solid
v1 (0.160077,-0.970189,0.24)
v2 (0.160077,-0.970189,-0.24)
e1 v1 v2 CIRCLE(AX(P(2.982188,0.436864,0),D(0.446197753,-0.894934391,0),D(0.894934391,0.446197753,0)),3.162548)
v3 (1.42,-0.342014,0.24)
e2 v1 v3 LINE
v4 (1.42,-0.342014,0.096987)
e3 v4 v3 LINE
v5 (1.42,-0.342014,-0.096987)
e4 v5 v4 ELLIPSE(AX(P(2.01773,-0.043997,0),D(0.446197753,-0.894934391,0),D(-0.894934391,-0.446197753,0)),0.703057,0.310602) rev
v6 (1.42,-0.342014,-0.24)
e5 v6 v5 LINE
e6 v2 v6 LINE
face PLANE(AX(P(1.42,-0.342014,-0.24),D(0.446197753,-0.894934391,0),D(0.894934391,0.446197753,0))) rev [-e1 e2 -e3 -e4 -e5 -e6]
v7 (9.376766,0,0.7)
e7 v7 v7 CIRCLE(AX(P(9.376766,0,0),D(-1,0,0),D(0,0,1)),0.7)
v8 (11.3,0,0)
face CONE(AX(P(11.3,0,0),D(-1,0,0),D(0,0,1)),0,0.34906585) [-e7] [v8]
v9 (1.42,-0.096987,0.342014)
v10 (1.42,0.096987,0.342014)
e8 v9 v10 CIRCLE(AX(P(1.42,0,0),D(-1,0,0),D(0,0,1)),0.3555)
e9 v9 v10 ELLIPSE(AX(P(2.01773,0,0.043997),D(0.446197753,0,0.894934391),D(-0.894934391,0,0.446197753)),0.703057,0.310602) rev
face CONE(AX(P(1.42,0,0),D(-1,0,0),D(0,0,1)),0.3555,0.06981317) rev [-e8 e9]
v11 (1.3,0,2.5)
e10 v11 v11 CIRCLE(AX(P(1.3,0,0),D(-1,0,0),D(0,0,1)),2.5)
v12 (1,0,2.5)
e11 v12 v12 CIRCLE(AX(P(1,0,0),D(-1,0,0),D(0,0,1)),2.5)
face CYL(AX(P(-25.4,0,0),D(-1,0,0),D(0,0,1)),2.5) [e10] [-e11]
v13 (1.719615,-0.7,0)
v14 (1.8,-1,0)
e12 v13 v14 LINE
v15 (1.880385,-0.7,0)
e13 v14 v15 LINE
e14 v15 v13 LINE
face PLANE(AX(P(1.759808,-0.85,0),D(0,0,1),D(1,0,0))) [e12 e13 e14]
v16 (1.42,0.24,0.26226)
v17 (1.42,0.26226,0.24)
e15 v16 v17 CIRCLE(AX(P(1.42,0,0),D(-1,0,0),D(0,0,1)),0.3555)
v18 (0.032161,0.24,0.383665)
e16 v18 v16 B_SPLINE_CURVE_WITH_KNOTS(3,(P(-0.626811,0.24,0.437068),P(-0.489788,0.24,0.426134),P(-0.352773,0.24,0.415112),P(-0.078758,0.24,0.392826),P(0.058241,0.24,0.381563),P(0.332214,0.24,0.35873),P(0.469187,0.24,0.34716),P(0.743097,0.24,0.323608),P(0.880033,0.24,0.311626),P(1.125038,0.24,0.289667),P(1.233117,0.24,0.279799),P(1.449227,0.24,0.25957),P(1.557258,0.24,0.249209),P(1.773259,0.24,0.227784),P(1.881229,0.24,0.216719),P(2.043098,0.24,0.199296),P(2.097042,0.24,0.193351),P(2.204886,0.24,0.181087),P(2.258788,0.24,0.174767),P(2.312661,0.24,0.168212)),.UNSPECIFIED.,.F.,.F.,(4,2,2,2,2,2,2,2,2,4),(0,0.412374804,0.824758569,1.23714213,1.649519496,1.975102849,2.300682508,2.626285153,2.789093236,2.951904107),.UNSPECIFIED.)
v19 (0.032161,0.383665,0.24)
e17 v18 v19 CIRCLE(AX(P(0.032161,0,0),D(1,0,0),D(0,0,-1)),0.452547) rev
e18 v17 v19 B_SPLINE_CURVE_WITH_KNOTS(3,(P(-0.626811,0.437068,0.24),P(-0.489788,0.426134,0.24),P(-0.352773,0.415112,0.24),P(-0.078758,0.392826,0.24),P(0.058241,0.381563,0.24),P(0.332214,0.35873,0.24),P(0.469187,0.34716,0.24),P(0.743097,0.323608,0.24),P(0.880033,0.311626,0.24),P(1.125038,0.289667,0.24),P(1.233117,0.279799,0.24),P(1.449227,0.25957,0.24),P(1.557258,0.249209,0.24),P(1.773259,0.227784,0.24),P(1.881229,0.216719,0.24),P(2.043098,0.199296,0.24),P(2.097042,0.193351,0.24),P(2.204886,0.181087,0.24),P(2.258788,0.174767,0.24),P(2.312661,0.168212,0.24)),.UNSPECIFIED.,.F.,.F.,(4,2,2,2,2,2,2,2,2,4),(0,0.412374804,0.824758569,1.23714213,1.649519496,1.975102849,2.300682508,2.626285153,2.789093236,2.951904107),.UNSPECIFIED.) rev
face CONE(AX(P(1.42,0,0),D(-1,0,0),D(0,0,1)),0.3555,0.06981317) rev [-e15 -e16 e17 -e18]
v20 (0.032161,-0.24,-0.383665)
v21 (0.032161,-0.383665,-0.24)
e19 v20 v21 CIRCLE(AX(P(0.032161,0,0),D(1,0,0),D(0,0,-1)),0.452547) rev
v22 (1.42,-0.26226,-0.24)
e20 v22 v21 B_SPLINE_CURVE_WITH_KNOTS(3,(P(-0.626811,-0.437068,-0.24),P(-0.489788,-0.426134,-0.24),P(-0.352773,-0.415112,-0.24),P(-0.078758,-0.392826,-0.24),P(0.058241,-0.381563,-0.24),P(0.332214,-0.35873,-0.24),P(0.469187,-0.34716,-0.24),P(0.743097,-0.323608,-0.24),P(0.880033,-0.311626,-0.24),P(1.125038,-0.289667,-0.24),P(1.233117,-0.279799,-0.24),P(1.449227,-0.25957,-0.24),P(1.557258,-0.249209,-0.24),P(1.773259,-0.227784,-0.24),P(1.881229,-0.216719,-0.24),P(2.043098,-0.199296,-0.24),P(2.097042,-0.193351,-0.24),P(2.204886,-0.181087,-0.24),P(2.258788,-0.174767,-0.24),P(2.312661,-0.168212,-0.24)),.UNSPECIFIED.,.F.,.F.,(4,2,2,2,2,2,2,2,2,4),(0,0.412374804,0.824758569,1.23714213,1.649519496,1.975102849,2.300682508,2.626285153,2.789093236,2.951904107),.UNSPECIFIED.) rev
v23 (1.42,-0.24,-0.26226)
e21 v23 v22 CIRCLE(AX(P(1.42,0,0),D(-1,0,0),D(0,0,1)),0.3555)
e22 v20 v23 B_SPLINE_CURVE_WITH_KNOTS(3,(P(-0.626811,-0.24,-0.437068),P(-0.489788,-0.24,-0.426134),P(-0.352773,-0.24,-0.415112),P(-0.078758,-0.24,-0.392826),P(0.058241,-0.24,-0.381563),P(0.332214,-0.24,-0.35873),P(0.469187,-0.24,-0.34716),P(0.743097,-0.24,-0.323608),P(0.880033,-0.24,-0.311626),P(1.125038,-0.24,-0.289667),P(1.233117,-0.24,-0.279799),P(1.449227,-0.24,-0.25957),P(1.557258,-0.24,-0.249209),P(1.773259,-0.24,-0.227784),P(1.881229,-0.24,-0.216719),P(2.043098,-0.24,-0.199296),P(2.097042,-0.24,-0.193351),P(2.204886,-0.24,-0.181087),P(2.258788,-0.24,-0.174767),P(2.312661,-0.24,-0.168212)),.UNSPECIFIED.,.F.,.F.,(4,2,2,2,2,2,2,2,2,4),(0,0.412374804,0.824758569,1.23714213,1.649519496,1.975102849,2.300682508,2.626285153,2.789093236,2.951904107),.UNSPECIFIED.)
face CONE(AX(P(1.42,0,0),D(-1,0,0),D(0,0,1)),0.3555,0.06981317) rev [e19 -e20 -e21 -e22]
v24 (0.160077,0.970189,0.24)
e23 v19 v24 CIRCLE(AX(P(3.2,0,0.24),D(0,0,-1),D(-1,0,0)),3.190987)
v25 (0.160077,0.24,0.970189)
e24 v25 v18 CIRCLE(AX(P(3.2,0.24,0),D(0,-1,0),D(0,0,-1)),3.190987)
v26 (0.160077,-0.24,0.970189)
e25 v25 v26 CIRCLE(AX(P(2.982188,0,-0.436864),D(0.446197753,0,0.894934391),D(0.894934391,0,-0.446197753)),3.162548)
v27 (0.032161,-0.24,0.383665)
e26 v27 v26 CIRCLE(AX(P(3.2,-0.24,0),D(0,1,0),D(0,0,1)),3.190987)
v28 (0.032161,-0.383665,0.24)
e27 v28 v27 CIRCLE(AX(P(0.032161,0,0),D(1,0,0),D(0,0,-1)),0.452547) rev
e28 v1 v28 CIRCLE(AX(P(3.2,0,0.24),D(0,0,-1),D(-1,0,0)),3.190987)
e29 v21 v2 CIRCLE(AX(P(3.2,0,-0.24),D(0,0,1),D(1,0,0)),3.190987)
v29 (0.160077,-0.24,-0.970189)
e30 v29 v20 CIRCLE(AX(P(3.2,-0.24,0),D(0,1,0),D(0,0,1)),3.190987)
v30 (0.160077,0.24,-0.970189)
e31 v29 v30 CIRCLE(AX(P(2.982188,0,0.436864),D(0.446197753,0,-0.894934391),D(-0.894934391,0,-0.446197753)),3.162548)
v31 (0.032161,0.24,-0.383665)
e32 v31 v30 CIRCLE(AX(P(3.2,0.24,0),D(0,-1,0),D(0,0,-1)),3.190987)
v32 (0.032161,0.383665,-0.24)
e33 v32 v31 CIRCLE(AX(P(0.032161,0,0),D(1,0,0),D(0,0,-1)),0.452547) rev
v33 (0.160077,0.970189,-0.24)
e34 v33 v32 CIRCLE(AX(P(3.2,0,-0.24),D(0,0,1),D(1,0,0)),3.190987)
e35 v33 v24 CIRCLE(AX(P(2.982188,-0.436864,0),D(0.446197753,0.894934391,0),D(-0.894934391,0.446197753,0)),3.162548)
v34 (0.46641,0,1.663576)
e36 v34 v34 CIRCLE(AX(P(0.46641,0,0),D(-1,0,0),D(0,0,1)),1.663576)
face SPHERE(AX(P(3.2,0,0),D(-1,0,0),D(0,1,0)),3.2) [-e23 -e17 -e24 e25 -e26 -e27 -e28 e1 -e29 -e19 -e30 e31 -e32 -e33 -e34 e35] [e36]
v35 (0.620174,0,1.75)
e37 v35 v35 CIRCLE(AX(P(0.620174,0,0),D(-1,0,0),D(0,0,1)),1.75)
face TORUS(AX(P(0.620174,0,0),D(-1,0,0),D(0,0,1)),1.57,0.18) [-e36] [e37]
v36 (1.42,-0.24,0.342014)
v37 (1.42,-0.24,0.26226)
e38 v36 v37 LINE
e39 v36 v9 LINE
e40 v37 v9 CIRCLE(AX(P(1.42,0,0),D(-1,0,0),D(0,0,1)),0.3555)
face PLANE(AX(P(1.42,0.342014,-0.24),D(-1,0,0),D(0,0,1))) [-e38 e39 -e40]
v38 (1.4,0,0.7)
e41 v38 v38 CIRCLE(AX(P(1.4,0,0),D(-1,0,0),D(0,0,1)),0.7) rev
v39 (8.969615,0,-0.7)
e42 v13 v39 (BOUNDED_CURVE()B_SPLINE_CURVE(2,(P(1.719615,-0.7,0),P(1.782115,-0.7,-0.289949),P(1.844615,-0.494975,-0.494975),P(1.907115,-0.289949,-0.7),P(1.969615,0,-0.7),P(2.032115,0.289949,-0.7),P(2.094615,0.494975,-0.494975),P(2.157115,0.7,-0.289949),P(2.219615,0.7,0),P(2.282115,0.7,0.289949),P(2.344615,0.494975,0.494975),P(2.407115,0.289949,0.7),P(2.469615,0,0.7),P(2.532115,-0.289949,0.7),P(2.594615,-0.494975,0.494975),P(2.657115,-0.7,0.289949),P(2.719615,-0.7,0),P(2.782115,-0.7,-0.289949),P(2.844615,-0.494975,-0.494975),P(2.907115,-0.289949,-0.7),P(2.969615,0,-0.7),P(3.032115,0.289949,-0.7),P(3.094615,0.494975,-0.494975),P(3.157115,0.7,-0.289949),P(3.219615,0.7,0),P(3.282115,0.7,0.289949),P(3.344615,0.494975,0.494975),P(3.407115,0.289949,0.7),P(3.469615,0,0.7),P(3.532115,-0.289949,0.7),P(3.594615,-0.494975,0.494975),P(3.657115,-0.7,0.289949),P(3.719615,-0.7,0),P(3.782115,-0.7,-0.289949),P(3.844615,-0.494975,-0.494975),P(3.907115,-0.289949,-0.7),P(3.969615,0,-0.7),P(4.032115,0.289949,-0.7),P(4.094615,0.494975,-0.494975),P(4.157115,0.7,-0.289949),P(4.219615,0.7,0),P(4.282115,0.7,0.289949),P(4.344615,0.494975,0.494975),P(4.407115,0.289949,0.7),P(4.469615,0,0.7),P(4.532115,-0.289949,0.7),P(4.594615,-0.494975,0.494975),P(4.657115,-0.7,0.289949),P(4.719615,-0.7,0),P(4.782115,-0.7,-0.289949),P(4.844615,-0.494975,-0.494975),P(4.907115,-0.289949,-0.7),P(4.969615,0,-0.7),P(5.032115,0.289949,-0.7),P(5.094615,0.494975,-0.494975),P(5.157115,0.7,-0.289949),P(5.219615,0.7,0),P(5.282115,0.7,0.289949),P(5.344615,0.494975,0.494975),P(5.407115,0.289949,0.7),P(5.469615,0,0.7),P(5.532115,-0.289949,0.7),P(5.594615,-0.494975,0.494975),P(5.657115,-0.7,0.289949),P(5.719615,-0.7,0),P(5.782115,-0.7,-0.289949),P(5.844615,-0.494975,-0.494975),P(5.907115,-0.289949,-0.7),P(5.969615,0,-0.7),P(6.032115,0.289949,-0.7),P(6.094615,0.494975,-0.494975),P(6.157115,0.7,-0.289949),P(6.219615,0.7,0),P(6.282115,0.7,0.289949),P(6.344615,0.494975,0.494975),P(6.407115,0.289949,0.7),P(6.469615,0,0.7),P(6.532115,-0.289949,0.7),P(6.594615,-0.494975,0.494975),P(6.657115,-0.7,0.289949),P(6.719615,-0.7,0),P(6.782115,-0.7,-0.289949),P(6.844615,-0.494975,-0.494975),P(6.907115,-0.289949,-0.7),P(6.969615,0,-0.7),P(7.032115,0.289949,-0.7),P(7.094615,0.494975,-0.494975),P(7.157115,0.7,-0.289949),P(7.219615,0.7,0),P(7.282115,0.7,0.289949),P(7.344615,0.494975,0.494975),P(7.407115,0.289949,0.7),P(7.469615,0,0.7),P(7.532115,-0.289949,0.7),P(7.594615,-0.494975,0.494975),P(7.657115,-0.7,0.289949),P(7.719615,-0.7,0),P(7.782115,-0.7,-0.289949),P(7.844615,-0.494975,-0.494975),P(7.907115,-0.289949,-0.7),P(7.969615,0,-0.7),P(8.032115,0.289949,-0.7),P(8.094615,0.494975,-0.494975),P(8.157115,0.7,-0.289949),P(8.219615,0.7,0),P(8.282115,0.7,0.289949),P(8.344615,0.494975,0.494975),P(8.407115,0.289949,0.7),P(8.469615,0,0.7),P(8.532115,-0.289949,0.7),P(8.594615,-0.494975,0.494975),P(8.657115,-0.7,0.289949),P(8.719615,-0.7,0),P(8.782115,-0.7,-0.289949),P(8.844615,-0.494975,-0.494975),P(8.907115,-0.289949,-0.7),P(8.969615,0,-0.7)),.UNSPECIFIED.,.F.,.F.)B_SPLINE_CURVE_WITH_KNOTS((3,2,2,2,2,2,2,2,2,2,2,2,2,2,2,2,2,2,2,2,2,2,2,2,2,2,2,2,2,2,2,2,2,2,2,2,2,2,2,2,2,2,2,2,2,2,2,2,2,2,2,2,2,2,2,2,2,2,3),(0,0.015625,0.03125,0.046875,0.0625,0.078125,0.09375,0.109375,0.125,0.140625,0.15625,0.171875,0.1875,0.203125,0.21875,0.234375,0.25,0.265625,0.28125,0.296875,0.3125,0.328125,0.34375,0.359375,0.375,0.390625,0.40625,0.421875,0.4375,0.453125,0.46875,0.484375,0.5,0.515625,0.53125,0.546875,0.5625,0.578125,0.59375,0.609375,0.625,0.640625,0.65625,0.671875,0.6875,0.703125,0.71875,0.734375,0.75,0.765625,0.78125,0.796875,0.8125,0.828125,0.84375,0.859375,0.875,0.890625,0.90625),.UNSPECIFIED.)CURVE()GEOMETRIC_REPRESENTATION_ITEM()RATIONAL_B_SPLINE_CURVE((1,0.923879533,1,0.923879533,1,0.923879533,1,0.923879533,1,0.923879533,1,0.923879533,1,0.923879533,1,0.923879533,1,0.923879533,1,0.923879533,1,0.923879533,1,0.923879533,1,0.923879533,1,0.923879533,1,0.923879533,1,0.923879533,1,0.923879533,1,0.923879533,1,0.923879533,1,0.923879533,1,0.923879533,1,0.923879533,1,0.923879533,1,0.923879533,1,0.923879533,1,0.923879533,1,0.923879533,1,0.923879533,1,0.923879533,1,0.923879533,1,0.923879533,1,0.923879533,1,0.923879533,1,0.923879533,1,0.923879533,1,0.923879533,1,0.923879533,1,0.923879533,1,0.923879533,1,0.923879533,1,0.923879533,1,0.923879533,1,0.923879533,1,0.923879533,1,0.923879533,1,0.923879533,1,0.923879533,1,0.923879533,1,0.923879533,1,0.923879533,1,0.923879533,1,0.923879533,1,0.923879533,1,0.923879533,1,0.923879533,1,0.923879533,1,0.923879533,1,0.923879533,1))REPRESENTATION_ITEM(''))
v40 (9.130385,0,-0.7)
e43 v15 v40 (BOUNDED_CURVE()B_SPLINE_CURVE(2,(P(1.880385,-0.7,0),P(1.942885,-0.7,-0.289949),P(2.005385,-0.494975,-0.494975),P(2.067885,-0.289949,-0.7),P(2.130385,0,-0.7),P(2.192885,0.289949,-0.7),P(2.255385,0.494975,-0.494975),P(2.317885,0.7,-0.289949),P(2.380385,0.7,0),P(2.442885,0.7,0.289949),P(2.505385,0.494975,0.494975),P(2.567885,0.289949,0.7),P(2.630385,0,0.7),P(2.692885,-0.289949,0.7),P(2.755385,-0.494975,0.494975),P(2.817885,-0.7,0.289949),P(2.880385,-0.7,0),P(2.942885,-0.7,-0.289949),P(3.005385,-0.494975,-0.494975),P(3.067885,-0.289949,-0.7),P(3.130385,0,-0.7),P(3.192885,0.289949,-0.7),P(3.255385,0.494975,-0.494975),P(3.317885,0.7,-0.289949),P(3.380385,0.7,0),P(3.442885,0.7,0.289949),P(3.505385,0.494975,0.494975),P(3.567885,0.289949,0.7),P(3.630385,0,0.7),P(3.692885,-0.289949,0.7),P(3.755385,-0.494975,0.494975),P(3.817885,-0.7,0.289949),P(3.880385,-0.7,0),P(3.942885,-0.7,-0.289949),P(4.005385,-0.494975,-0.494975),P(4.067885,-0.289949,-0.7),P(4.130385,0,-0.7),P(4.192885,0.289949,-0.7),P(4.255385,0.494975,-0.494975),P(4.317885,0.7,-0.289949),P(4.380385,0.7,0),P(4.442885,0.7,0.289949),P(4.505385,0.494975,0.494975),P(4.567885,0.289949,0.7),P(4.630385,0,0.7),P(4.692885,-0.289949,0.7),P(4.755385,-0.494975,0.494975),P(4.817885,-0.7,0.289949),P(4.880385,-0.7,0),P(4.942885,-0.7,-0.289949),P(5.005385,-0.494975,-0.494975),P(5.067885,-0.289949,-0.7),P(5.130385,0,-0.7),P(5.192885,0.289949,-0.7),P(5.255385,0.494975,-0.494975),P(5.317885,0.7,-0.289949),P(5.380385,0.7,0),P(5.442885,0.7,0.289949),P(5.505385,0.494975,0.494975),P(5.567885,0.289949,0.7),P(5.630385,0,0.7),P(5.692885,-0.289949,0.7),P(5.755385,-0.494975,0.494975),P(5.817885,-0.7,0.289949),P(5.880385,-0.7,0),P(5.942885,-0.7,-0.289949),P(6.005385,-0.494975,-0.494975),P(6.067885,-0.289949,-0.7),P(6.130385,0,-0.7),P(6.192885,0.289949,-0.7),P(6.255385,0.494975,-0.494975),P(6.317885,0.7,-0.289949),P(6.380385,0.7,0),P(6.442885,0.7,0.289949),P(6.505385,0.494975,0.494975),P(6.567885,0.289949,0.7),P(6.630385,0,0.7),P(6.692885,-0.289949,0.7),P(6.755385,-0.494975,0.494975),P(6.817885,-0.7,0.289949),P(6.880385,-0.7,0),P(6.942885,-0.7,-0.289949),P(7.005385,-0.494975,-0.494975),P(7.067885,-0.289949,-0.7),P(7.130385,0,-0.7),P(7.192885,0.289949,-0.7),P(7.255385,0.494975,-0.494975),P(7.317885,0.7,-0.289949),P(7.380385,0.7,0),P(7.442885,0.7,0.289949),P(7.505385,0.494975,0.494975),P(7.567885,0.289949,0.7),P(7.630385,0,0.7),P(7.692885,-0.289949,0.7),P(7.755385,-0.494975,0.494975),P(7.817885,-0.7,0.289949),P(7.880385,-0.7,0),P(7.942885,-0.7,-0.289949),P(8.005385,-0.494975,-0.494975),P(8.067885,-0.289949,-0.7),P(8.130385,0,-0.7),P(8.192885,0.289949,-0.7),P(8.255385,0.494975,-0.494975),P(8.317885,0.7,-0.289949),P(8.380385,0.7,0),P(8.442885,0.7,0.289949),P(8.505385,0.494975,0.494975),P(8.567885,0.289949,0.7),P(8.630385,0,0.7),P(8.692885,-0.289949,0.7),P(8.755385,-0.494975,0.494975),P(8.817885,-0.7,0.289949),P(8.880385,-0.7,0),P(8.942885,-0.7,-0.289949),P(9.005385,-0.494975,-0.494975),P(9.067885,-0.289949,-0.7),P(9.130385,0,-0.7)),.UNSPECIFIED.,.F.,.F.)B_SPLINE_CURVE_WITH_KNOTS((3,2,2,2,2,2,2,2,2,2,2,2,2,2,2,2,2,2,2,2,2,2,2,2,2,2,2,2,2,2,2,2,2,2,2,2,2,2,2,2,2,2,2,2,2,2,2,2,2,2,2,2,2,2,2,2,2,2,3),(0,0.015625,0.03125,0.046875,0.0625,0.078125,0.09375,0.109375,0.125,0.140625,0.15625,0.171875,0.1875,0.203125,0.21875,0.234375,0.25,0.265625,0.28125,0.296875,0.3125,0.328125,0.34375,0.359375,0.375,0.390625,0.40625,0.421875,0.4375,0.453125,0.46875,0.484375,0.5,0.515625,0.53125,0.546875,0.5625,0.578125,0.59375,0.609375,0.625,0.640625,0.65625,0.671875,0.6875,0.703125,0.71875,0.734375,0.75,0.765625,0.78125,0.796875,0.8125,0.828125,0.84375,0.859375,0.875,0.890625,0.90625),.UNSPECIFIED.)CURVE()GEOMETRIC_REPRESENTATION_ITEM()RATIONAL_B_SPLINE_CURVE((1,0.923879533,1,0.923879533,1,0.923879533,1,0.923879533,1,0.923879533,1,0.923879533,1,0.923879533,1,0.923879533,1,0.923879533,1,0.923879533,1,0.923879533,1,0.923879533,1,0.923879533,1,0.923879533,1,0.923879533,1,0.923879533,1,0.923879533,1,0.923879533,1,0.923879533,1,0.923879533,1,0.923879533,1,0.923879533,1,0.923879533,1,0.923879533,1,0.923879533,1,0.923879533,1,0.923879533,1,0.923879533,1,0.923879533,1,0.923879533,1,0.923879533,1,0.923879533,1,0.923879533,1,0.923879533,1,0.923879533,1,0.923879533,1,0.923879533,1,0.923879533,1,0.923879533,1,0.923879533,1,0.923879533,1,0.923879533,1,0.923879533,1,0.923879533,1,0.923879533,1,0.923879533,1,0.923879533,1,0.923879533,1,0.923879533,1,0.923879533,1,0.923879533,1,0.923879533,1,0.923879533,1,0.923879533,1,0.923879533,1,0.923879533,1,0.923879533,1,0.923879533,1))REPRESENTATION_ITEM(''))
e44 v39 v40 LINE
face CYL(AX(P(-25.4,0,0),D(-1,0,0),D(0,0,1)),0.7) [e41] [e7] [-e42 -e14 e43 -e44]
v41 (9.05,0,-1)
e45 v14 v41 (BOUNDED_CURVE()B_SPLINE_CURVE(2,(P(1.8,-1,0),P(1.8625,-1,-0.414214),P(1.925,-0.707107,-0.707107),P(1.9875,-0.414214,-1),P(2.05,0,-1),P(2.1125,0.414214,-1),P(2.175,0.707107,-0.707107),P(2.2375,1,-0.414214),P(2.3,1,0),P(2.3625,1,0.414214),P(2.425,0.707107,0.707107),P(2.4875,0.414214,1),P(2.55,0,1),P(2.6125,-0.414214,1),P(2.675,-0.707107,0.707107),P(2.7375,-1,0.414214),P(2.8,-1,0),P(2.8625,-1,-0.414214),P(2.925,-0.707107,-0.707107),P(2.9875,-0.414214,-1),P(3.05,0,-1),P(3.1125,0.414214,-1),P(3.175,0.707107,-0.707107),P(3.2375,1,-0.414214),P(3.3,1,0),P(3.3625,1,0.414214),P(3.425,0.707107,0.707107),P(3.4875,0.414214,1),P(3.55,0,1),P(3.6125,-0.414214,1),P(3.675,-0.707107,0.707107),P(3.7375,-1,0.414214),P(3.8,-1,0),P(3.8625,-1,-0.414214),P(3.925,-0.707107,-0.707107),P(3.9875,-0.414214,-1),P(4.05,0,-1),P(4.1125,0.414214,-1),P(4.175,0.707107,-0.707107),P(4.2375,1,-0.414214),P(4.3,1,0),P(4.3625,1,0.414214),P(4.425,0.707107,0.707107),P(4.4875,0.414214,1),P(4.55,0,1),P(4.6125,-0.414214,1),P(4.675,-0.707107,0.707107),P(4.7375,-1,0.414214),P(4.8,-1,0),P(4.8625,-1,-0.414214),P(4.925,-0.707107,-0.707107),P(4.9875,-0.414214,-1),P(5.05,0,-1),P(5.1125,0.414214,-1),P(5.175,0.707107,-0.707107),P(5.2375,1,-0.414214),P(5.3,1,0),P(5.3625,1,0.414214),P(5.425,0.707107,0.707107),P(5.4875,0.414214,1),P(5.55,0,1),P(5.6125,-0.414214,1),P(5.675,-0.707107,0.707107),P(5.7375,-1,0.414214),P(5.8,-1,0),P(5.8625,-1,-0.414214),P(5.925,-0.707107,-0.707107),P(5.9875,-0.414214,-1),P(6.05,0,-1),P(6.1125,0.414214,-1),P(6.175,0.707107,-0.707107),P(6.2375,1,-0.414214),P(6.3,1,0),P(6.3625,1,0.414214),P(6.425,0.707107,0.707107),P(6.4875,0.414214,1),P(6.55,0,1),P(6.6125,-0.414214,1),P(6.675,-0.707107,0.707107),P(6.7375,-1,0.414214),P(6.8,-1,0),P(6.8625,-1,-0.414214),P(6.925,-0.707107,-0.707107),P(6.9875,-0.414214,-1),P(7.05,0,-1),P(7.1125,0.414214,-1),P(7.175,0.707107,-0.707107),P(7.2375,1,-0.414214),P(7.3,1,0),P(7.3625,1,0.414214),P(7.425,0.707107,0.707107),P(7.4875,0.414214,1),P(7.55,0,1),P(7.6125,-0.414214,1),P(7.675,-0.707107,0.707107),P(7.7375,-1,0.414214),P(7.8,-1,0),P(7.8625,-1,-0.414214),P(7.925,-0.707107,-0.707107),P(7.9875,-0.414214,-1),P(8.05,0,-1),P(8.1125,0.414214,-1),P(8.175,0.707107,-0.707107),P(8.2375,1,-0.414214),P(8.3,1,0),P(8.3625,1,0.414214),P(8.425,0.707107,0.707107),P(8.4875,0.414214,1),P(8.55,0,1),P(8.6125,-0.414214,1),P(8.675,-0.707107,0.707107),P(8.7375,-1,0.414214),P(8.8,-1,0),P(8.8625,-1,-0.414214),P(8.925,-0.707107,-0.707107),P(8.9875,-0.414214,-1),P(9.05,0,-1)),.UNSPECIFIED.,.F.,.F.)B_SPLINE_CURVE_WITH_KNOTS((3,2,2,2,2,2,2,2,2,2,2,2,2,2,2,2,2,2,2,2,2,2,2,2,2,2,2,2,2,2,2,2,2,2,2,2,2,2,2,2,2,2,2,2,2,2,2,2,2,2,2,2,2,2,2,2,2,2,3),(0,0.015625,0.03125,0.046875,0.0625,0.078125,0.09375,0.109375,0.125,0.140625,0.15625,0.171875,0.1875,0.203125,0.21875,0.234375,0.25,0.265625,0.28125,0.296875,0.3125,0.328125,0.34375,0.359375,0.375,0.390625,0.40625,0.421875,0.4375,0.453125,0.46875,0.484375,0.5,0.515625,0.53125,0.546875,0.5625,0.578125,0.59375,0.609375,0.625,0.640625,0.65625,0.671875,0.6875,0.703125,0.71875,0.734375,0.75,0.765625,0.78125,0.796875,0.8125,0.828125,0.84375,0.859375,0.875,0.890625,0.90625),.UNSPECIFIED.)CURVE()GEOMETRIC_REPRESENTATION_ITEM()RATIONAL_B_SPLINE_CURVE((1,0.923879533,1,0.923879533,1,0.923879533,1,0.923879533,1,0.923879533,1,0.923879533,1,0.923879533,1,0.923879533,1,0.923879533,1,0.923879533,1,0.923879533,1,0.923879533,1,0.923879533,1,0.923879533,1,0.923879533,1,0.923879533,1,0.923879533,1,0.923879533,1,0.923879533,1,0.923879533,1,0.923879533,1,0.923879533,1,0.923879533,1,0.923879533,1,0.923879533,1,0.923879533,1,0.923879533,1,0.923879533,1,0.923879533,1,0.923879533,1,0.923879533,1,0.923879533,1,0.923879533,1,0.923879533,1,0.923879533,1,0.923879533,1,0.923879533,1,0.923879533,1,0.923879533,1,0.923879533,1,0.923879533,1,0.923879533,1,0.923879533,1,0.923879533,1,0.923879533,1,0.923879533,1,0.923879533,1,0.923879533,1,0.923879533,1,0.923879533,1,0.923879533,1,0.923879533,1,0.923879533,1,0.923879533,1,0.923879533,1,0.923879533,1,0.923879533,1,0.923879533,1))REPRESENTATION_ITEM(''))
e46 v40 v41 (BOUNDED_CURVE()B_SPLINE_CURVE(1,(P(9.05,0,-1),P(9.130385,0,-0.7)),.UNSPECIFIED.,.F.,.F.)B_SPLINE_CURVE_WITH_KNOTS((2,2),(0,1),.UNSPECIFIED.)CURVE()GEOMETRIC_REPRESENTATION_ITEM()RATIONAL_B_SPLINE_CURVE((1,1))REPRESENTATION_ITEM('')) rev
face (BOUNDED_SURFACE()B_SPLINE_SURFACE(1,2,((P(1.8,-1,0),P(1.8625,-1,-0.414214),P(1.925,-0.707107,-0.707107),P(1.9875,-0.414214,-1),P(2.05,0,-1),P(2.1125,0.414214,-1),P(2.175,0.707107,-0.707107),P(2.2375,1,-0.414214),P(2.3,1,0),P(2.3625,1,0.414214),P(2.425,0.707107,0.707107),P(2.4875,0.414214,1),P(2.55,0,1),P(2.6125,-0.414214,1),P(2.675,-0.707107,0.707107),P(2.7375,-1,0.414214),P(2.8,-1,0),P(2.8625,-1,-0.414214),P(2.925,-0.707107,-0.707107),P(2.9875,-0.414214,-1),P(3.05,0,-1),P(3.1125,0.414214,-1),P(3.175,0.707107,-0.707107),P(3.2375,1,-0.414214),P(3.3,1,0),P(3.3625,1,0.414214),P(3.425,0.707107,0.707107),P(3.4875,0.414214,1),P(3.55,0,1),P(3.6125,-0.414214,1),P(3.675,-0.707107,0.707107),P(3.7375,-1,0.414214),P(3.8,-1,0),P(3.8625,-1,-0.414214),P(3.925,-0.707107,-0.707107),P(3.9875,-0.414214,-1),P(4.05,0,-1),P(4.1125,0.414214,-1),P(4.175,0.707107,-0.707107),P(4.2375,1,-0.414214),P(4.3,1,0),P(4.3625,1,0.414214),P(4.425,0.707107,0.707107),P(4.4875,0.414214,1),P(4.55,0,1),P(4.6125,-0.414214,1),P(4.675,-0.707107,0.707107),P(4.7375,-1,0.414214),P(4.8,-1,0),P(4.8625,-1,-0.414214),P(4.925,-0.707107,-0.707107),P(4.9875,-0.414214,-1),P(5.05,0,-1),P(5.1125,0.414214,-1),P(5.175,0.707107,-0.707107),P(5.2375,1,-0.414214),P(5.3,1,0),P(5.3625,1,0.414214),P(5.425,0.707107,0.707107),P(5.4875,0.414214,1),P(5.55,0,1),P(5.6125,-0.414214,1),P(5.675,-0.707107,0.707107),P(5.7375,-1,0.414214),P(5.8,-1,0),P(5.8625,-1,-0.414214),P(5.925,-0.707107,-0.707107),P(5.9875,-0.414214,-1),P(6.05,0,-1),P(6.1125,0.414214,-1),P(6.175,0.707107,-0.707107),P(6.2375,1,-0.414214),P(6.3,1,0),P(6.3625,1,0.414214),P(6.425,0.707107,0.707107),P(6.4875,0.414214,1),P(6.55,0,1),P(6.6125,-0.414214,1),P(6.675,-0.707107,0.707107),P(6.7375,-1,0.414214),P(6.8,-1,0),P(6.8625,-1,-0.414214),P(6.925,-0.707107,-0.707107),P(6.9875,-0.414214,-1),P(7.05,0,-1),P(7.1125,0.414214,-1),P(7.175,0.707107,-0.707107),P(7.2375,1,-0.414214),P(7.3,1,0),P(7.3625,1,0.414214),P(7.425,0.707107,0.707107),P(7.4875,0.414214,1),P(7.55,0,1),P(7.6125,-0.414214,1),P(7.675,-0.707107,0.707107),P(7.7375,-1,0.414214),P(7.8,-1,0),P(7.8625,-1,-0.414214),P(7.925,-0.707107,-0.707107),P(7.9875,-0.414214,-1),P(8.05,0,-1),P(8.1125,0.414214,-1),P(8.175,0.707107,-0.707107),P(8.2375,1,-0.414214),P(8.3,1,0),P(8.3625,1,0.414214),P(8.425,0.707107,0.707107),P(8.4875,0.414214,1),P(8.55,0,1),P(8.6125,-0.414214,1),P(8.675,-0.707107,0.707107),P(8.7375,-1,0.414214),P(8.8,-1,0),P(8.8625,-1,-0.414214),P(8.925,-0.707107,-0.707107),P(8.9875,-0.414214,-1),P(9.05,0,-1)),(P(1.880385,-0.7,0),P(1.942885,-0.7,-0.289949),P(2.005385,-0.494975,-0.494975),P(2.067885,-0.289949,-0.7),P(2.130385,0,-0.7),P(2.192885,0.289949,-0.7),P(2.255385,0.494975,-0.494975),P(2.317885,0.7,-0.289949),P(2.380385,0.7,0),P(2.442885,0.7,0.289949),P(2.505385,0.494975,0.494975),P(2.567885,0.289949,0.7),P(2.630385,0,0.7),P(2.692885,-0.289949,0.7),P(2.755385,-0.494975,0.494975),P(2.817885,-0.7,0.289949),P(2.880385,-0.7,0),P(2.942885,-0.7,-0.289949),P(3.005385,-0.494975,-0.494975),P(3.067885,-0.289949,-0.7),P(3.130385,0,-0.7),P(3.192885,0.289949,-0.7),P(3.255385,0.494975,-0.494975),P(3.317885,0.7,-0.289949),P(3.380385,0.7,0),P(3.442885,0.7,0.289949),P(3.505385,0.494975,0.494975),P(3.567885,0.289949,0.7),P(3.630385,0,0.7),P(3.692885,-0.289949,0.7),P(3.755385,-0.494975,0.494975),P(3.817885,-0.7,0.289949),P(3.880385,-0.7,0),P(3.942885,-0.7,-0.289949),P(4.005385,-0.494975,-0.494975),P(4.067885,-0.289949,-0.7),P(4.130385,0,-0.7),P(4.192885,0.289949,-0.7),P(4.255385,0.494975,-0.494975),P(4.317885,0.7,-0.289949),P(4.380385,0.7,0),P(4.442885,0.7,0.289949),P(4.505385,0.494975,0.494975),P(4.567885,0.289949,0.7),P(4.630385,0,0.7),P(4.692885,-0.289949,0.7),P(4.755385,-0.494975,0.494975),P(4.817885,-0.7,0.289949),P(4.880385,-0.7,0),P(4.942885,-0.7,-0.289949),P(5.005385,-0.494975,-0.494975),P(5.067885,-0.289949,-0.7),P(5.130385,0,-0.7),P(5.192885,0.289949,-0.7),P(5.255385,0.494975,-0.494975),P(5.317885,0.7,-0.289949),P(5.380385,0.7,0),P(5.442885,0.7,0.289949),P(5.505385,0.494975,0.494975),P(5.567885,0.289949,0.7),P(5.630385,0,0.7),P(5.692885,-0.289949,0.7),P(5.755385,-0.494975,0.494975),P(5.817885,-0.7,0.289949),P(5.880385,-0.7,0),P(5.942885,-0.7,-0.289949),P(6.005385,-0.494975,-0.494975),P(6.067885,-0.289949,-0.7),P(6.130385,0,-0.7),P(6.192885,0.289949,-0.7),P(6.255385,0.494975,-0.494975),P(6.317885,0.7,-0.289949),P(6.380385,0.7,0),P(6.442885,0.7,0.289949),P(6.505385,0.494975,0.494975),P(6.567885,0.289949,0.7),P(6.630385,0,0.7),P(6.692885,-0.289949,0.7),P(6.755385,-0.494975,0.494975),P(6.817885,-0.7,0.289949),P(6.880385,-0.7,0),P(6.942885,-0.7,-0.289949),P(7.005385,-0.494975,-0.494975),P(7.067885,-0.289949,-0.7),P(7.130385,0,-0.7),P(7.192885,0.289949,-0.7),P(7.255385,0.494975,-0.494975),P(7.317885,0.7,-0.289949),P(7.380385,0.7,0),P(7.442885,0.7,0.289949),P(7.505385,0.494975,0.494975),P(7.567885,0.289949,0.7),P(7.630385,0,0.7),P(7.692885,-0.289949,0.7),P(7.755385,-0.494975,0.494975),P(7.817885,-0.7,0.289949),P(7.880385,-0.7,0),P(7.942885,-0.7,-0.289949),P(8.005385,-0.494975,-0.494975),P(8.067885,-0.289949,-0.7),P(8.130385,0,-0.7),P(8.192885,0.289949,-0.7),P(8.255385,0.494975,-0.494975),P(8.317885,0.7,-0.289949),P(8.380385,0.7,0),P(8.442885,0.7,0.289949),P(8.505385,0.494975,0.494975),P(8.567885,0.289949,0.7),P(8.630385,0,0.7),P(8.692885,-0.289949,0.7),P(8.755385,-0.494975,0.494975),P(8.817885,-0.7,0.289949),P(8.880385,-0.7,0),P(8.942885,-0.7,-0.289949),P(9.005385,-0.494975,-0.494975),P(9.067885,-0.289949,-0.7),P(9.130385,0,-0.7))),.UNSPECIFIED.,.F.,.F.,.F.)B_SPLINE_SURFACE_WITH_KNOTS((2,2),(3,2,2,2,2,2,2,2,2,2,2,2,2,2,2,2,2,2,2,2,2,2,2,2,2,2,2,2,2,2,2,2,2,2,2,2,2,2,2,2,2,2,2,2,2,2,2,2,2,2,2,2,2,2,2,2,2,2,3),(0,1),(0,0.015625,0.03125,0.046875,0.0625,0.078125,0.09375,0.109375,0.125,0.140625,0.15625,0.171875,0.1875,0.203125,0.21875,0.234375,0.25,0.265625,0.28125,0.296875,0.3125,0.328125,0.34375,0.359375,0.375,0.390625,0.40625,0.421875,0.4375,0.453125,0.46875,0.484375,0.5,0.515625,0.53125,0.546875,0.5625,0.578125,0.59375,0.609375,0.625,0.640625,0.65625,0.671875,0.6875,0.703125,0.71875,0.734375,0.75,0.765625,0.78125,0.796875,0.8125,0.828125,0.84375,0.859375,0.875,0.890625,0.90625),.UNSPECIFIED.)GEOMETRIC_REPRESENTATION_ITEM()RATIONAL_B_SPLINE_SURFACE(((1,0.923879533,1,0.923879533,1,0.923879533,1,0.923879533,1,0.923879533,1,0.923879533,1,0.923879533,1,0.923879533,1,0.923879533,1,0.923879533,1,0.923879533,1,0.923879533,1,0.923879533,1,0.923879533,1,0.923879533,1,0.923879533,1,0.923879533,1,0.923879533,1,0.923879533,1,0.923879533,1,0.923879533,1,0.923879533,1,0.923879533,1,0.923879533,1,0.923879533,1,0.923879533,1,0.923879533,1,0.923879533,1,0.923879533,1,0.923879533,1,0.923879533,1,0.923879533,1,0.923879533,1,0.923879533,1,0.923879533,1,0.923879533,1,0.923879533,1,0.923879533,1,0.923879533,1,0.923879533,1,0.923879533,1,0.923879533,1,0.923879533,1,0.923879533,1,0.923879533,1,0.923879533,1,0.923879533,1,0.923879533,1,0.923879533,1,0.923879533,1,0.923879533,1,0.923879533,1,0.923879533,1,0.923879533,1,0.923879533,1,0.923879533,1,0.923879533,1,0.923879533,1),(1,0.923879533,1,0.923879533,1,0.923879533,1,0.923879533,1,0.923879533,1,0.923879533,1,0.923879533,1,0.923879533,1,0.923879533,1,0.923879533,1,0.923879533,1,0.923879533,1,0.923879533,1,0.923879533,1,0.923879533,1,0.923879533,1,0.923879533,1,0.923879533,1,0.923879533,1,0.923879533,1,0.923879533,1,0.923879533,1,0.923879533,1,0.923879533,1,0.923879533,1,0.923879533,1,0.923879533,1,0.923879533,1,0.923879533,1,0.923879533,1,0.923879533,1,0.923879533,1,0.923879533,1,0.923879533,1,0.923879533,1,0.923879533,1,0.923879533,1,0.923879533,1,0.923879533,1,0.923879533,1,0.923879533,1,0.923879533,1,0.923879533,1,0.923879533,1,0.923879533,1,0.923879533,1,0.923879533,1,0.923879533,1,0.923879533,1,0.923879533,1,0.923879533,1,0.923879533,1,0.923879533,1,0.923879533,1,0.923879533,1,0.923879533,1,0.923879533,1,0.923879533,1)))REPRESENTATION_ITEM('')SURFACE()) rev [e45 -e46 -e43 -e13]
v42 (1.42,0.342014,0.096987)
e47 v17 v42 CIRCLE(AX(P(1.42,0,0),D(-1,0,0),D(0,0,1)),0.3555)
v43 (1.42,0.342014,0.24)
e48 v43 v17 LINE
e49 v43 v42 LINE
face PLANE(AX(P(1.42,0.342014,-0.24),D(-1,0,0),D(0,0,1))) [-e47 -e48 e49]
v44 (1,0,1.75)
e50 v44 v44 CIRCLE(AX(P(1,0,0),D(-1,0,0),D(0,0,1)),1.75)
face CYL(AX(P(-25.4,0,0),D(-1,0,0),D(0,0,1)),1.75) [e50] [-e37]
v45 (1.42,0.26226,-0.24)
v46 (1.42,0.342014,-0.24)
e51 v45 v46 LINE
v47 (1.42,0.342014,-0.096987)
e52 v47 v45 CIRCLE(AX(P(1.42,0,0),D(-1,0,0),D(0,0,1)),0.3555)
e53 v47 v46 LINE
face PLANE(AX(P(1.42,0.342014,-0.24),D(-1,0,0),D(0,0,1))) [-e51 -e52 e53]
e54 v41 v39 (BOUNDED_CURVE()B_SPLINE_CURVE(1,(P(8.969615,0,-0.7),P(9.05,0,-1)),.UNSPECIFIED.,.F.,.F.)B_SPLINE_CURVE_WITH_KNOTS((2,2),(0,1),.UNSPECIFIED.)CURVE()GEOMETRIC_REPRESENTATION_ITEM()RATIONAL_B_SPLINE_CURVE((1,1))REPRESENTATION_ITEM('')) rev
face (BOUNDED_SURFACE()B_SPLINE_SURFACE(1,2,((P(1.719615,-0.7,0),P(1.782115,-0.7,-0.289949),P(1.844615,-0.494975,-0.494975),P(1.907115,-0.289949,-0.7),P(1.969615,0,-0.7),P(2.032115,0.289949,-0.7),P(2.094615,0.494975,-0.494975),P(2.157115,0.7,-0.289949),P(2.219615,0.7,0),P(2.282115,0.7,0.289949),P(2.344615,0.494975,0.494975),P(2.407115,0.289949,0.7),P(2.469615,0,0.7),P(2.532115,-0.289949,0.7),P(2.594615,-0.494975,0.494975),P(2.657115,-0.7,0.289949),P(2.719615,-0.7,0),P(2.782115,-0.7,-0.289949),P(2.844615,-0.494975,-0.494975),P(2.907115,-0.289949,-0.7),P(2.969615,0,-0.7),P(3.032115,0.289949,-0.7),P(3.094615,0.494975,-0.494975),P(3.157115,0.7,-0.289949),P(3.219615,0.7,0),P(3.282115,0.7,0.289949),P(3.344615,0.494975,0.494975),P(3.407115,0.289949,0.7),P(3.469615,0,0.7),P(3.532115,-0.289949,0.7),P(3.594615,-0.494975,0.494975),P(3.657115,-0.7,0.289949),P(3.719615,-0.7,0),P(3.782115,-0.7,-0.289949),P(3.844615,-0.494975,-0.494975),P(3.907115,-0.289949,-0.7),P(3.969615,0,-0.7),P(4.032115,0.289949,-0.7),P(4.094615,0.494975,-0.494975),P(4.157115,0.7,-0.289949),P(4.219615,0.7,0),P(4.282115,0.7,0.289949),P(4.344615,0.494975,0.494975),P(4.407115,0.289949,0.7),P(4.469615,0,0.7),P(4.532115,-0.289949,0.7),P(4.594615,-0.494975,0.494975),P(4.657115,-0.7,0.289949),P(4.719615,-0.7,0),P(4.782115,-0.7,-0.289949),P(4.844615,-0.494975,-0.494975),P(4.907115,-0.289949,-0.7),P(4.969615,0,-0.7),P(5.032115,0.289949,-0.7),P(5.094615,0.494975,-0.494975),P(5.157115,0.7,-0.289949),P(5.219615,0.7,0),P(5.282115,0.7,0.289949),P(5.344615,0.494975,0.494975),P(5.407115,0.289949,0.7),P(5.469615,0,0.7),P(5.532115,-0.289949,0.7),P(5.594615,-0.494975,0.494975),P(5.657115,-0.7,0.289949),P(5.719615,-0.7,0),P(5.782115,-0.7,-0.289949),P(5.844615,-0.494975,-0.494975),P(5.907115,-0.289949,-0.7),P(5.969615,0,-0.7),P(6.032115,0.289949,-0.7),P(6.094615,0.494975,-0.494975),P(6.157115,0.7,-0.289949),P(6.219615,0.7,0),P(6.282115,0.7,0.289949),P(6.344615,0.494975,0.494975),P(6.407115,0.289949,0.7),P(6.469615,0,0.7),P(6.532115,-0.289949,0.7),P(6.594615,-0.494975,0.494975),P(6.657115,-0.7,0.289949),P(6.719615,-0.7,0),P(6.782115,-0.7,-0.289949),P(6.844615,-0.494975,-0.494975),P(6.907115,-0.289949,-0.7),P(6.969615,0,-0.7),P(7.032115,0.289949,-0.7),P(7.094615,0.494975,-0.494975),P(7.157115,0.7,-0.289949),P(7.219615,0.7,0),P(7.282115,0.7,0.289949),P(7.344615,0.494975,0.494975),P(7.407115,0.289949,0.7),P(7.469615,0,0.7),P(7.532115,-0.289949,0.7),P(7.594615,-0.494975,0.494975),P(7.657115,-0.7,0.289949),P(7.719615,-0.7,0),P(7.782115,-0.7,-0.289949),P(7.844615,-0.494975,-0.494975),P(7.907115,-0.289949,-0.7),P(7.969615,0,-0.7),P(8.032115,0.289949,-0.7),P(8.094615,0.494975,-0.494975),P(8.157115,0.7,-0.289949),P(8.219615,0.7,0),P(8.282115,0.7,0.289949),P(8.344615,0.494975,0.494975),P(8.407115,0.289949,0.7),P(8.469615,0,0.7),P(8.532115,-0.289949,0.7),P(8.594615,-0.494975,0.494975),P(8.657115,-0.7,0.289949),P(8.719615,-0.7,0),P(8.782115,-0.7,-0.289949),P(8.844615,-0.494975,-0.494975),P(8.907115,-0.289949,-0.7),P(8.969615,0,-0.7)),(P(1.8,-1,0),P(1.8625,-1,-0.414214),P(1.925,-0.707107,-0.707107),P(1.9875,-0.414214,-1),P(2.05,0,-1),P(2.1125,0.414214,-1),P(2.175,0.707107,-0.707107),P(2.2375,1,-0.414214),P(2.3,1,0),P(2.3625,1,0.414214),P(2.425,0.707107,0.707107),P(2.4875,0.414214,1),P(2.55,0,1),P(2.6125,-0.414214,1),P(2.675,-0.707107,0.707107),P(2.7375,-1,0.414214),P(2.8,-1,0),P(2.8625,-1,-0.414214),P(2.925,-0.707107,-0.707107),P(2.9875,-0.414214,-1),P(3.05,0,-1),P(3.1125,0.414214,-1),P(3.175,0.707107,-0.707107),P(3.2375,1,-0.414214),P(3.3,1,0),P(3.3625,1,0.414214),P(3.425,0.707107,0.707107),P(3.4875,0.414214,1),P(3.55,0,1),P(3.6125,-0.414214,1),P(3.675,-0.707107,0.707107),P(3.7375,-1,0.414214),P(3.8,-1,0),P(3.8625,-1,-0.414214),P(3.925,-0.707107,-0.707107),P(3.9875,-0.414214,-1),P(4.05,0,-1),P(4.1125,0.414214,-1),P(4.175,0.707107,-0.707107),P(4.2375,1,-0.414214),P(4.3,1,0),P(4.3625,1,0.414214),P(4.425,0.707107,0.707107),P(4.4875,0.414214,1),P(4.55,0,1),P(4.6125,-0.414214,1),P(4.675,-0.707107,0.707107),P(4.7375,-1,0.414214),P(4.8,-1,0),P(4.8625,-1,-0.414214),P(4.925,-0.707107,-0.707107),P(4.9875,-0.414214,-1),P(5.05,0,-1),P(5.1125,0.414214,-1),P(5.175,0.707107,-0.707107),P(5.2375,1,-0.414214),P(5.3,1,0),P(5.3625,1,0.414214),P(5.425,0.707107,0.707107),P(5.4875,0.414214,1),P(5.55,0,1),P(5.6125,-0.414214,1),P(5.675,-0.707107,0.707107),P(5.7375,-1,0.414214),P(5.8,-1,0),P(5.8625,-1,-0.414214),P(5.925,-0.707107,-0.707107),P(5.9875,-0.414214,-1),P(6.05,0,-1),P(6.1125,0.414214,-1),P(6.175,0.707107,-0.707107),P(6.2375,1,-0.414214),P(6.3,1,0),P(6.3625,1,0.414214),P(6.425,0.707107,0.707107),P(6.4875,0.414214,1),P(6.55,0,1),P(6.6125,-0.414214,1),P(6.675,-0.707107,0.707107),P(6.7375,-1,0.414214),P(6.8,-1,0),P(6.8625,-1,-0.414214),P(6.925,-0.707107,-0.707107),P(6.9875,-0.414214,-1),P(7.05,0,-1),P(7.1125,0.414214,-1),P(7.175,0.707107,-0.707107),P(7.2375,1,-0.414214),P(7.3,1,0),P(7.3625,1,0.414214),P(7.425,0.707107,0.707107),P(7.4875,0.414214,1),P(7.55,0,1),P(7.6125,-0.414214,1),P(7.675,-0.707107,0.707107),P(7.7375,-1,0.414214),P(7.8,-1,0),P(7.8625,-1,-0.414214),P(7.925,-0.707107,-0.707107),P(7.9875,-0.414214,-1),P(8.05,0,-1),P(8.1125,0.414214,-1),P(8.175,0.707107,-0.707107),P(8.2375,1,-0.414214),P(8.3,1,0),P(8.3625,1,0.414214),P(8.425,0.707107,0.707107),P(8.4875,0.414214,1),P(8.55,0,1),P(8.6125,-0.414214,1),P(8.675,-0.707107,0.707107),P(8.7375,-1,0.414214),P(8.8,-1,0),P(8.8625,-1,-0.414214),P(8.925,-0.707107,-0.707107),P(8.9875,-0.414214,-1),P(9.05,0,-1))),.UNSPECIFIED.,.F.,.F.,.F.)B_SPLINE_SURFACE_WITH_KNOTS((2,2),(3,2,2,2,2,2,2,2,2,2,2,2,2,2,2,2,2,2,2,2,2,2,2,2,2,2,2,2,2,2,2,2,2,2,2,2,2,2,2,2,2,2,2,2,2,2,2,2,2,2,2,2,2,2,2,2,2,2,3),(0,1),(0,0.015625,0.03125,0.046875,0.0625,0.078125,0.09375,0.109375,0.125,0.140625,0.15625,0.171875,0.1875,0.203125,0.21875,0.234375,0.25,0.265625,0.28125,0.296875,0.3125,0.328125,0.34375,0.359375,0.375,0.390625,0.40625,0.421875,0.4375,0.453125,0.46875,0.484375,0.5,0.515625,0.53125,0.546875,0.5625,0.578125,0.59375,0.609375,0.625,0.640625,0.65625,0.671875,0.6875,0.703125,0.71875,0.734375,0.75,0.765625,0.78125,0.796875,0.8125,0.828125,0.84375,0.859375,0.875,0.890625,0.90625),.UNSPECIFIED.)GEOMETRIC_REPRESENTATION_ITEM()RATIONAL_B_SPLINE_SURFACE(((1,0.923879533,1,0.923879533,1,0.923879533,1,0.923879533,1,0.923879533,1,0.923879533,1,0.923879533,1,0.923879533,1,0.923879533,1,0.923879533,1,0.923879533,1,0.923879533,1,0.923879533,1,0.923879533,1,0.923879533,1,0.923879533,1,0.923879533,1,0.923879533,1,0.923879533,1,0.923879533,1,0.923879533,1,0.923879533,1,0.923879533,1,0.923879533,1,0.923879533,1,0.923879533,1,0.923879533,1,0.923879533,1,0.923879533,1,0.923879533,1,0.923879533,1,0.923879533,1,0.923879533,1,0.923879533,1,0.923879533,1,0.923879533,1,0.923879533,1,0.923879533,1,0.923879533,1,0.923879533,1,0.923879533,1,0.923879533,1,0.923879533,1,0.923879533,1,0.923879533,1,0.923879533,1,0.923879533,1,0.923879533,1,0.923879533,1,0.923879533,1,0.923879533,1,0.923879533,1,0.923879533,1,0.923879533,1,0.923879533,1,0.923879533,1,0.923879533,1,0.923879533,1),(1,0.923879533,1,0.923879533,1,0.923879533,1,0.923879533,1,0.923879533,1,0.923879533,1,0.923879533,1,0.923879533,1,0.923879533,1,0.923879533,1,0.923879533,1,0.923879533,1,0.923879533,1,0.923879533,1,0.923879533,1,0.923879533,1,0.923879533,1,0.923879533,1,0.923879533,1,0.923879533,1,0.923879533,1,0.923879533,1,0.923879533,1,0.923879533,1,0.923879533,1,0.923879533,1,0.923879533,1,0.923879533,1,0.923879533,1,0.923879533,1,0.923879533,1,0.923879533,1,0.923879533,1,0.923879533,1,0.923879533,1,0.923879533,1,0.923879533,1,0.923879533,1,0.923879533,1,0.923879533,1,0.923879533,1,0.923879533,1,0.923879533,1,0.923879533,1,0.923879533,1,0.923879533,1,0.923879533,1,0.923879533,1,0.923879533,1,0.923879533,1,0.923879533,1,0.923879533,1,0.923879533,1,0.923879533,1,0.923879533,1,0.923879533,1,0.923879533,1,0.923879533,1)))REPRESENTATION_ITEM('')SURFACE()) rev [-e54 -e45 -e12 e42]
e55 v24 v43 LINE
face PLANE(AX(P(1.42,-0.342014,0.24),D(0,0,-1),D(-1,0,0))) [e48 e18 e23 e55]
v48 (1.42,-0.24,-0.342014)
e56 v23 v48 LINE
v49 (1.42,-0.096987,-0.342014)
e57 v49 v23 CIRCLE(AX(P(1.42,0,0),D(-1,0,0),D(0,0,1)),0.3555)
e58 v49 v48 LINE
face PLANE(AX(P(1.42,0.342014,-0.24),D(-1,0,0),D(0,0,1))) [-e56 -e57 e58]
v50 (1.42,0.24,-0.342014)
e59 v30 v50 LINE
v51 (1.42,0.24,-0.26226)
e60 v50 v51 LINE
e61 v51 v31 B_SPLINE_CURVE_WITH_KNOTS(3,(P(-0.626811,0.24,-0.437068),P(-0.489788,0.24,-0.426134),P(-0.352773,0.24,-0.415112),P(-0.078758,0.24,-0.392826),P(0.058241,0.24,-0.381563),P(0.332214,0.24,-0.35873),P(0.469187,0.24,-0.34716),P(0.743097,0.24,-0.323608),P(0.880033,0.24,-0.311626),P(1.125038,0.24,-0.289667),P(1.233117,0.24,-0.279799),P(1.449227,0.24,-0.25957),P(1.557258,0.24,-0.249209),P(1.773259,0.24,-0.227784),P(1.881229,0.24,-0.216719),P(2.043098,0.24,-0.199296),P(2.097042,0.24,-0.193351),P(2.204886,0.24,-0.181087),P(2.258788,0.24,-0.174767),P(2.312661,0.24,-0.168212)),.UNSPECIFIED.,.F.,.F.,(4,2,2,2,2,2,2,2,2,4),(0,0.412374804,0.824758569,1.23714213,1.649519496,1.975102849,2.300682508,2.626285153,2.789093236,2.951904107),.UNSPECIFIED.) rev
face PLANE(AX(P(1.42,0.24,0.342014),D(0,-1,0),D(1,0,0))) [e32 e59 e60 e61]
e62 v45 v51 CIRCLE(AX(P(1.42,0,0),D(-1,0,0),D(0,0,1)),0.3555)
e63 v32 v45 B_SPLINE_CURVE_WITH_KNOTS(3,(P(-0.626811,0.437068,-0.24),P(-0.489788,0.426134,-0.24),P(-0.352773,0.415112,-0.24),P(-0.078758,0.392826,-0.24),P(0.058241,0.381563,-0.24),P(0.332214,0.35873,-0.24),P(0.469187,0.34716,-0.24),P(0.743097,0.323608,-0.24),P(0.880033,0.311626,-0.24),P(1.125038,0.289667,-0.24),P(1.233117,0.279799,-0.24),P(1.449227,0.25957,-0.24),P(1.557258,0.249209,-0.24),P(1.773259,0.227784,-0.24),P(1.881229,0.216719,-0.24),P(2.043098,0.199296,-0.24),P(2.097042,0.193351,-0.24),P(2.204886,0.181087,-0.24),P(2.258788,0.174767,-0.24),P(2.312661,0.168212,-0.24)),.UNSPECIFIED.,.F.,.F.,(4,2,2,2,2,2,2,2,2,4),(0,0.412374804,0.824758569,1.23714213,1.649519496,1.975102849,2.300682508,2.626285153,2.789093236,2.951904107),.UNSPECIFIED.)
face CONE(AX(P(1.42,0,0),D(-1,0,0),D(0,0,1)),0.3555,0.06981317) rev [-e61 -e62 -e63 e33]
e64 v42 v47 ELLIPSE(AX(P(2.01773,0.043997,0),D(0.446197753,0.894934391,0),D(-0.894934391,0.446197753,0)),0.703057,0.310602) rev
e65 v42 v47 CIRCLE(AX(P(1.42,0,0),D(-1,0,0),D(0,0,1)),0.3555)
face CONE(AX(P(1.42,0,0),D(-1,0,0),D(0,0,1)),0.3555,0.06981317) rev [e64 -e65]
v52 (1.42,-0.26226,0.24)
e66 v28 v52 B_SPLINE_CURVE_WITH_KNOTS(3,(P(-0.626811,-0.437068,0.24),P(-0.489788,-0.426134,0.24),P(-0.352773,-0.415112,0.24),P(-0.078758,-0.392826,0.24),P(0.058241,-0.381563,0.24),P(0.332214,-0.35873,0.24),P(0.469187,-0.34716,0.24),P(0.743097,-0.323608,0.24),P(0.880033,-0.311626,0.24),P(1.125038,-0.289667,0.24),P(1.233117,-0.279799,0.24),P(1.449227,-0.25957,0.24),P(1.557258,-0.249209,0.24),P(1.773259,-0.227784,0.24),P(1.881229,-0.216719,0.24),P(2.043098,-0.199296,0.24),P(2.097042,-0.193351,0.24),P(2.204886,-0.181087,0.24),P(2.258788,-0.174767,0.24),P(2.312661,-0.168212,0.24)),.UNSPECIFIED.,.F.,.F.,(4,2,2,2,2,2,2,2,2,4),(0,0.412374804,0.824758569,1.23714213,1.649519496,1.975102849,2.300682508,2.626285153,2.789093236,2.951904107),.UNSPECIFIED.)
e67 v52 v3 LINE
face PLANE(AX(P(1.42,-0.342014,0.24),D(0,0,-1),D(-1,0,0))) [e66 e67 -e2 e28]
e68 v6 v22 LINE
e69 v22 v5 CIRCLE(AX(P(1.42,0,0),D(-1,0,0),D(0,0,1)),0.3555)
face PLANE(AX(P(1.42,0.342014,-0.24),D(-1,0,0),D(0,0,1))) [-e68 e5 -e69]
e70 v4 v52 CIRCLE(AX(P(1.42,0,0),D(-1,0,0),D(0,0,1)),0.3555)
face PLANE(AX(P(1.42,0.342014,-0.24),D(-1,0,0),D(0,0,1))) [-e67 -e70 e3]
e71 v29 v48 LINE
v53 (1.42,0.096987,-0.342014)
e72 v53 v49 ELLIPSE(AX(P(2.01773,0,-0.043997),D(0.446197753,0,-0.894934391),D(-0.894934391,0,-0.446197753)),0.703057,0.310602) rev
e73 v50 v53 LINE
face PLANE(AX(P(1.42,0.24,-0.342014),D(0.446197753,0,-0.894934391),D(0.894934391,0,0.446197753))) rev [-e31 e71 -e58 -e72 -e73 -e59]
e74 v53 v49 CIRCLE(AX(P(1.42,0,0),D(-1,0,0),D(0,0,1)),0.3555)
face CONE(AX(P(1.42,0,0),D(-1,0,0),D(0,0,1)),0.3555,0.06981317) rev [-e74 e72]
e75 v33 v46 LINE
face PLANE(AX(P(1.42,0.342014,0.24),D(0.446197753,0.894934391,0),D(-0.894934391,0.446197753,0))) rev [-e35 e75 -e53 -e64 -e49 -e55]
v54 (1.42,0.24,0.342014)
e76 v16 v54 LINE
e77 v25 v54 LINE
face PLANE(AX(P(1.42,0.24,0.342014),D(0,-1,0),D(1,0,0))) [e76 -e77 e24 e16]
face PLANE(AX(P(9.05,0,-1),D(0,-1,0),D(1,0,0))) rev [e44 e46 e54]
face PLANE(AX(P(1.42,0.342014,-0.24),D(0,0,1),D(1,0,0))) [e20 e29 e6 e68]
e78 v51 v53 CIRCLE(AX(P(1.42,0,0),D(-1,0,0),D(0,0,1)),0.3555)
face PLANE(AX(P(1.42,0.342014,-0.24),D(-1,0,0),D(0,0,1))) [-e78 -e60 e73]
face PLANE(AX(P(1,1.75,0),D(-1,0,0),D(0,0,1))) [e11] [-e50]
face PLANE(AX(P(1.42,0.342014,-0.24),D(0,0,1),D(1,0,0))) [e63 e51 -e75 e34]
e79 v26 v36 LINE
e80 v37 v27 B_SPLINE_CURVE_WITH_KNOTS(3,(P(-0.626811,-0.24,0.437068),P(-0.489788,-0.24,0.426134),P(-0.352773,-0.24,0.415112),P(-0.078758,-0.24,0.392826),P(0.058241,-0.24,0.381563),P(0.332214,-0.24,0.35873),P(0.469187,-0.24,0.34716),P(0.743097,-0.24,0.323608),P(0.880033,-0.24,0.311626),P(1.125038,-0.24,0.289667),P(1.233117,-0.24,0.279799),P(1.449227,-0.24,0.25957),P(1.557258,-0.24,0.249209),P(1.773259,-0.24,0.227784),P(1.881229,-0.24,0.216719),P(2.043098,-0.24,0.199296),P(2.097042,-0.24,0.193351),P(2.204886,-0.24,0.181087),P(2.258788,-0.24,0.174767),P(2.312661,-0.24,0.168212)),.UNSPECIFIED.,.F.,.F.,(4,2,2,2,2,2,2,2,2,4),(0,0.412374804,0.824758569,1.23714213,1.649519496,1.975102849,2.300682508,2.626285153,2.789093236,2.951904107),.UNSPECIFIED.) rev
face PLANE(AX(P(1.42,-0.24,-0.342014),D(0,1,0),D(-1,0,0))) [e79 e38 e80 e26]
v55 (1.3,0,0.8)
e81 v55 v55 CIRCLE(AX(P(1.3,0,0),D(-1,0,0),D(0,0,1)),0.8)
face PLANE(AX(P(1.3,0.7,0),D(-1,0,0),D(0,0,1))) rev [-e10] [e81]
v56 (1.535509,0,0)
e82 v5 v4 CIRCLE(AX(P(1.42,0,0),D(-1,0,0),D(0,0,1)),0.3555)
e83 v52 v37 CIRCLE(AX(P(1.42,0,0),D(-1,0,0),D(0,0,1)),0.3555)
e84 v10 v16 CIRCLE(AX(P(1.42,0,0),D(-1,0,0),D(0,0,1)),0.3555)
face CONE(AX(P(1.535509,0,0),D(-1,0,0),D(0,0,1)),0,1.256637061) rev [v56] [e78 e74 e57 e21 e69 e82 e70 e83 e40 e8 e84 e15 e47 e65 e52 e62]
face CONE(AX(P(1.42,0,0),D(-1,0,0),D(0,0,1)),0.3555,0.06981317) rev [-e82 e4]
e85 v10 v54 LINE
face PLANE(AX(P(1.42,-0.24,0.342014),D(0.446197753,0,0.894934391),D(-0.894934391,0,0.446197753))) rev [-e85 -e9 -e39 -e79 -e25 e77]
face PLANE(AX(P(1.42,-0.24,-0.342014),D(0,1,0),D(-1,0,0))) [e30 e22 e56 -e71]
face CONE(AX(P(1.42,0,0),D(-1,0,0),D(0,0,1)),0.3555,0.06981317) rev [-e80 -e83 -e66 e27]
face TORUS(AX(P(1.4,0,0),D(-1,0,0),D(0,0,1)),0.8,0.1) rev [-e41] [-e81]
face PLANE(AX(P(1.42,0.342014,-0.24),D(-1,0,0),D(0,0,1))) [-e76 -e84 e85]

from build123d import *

# Parameters (mm, degrees)
FILLET1_R       = 0.1
RECPAT_COUNT    = 2
RECPAT_ANGLE    = 90
BALAYAGE1_PITCH = 1


with BuildPart() as part:
    # BodySke → Base-Revolve (revolve)
    with BuildSketch(Plane.XY, mode=Mode.PRIVATE) as base_revolve_sk:
        with BuildLine():
            Line((1.3, 0.7), (1.3, 2.5))
            Line((1.3, 2.5), (1, 2.5))
            Line((1, 2.5), (1, 1.75))
            Line((1, 1.75), (0.620174425, 1.75))
            ThreePointArc((0.620174425, 1.75), (0.531980628, 1.726913525), (0.466409986, 1.663576159))
            ThreePointArc((0.466409986, 1.663576159), (0.118808019, 0.863861087), (0, 0))
            Line((0, 0), (11.3, 0))
            Line((11.3, 0), (9.376765806, 0.7))
            Line((9.376765806, 0.7), (1.3, 0.7))
        make_face()
    revolve(base_revolve_sk.sketch.rotate(Axis((-25.4, 0, 0), (1, 0, 0)), 90), axis=Axis((-25.4, 0, 0), (1, 0, 0)))

    # Fillet1
    fillet1_edges = [part.edges().sort_by_distance(p)[0] for p in [
        (1.3, 0, -0.7),
    ]]
    fillet(fillet1_edges, radius=FILLET1_R)

    # Sketch3 → Recess section 0
    with BuildSketch(Plane(origin=(0, 0, 0), x_dir=(0, 0, -1), z_dir=(1, 0, 0))):
        with BuildLine():
            Line((0.24, -1.05), (-0.24, -1.05))
            Line((-0.24, -1.05), (-0.24, 1.05))
            Line((-0.24, 1.05), (0.24, 1.05))
            Line((0.24, 1.05), (0.24, -1.05))
        make_face()
    # Sketch4 → Recess section 1
    with BuildSketch(Plane(origin=(1.42, 0, 0), x_dir=(0, 0, -1), z_dir=(1, 0, 0))):
        with BuildLine():
            Line((0.24, -0.342014235), (-0.24, -0.342014235))
            Line((-0.24, -0.342014235), (-0.24, 0.342014235))
            Line((-0.24, 0.342014235), (0.24, 0.342014235))
            Line((0.24, 0.342014235), (0.24, -0.342014235))
        make_face()
    recess = loft(mode=Mode.SUBTRACT)

    # RecPat: Recess ×2 about axis
    recpat_axis = Axis((0, 0, 0), (1, 0, 0))
    for i in range(1, RECPAT_COUNT):
        add(recess.rotate(recpat_axis, i * RECPAT_ANGLE / (RECPAT_COUNT - 1)), mode=Mode.SUBTRACT)

    # RecCorSke → RecessCore (revolve, cut)
    with BuildSketch(Plane.XY, mode=Mode.PRIVATE) as recesscore_sk:
        Polygon((0, 0), (0, 0.454796073), (1.42, 0.3555), (1.535508952, 0), align=None)
    revolve(recesscore_sk.sketch.rotate(Axis((-3.175, 0, 0), (1, 0, 0)), 13.894577695), axis=Axis((-3.175, 0, 0), (1, 0, 0)), mode=Mode.SUBTRACT)

    # Balayage1: the profile of Esquisse2 profile screwed along a right-hand helix of 7.25 turns, 8 arcs to a turn; built about Z, then put on its axis
    balayage1_z = Axis((0, 0, 0), (0, 0, 1))
    balayage1_corners = [(0.6997, 0, -0.080465142), (1, 0, 0), (0.6997, 0, 0.080465142)]
    with BuildLine(mode=Mode.PRIVATE) as balayage1_profile:
        Line(balayage1_corners[0], balayage1_corners[1])
        Line(balayage1_corners[1], balayage1_corners[2])
        Line(balayage1_corners[2], balayage1_corners[0])
    balayage1_cap = Face(balayage1_profile.wire())
    balayage1_turn_angles = [0, 22.5, 45, 67.5, 90, 112.5, 135, 157.5, 180, 202.5, 225, 247.5, 270, 292.5, 315, 337.5, 360]
    balayage1_turn_weights = [1, 0.9238795325112867, 1, 0.9238795325112867, 1, 0.9238795325112867, 1, 0.9238795325112867, 1, 0.9238795325112867, 1, 0.9238795325112867, 1, 0.9238795325112867, 1, 0.9238795325112867, 1]
    balayage1_turn_rails = [Edge.make_bspline([Vector(p[0], p[1], 0).rotate(balayage1_z, balayage1_turn_angles[k]) / balayage1_turn_weights[k] + Vector(0, 0, p[2] + BALAYAGE1_PITCH * balayage1_turn_angles[k] / 360) for k in range(17)], [0, 0, 0, 1, 1, 2, 2, 3, 3, 4, 4, 5, 5, 6, 6, 7, 7, 8, 8, 8], 2, balayage1_turn_weights) for p in balayage1_corners]
    balayage1_turn_sides = [Face.make_surface_from_curves(balayage1_turn_rails[p[0]], balayage1_turn_rails[p[1]]) for p in [(0, 1), (1, 2), (2, 0)]]
    balayage1_last_angles = [2520, 2542.5, 2565, 2587.5, 2610]
    balayage1_last_weights = [1, 0.9238795325112867, 1, 0.9238795325112731, 1]
    balayage1_last_rails = [Edge.make_bspline([Vector(p[0], p[1], 0).rotate(balayage1_z, balayage1_last_angles[k]) / balayage1_last_weights[k] + Vector(0, 0, p[2] + BALAYAGE1_PITCH * balayage1_last_angles[k] / 360) for k in range(5)], [0, 0, 0, 1, 1, 2, 2, 2], 2, balayage1_last_weights) for p in balayage1_corners]
    balayage1_last_sides = [Face.make_surface_from_curves(balayage1_last_rails[p[0]], balayage1_last_rails[p[1]]) for p in [(0, 1), (1, 2), (2, 0)]]
    balayage1 = Plane(origin=(1.8, 0, 0), x_dir=(0, -1, 0), z_dir=(1, 0, 0)) * Solid(Shell([*[p.moved(Location((0, 0, BALAYAGE1_PITCH * i))) for i in range(7) for p in balayage1_turn_sides], *balayage1_last_sides, balayage1_cap, balayage1_cap.rotate(balayage1_z, 2610).moved(Location((0, 0, BALAYAGE1_PITCH * 2610 / 360)))]))
    add(balayage1)


solid = part.part
